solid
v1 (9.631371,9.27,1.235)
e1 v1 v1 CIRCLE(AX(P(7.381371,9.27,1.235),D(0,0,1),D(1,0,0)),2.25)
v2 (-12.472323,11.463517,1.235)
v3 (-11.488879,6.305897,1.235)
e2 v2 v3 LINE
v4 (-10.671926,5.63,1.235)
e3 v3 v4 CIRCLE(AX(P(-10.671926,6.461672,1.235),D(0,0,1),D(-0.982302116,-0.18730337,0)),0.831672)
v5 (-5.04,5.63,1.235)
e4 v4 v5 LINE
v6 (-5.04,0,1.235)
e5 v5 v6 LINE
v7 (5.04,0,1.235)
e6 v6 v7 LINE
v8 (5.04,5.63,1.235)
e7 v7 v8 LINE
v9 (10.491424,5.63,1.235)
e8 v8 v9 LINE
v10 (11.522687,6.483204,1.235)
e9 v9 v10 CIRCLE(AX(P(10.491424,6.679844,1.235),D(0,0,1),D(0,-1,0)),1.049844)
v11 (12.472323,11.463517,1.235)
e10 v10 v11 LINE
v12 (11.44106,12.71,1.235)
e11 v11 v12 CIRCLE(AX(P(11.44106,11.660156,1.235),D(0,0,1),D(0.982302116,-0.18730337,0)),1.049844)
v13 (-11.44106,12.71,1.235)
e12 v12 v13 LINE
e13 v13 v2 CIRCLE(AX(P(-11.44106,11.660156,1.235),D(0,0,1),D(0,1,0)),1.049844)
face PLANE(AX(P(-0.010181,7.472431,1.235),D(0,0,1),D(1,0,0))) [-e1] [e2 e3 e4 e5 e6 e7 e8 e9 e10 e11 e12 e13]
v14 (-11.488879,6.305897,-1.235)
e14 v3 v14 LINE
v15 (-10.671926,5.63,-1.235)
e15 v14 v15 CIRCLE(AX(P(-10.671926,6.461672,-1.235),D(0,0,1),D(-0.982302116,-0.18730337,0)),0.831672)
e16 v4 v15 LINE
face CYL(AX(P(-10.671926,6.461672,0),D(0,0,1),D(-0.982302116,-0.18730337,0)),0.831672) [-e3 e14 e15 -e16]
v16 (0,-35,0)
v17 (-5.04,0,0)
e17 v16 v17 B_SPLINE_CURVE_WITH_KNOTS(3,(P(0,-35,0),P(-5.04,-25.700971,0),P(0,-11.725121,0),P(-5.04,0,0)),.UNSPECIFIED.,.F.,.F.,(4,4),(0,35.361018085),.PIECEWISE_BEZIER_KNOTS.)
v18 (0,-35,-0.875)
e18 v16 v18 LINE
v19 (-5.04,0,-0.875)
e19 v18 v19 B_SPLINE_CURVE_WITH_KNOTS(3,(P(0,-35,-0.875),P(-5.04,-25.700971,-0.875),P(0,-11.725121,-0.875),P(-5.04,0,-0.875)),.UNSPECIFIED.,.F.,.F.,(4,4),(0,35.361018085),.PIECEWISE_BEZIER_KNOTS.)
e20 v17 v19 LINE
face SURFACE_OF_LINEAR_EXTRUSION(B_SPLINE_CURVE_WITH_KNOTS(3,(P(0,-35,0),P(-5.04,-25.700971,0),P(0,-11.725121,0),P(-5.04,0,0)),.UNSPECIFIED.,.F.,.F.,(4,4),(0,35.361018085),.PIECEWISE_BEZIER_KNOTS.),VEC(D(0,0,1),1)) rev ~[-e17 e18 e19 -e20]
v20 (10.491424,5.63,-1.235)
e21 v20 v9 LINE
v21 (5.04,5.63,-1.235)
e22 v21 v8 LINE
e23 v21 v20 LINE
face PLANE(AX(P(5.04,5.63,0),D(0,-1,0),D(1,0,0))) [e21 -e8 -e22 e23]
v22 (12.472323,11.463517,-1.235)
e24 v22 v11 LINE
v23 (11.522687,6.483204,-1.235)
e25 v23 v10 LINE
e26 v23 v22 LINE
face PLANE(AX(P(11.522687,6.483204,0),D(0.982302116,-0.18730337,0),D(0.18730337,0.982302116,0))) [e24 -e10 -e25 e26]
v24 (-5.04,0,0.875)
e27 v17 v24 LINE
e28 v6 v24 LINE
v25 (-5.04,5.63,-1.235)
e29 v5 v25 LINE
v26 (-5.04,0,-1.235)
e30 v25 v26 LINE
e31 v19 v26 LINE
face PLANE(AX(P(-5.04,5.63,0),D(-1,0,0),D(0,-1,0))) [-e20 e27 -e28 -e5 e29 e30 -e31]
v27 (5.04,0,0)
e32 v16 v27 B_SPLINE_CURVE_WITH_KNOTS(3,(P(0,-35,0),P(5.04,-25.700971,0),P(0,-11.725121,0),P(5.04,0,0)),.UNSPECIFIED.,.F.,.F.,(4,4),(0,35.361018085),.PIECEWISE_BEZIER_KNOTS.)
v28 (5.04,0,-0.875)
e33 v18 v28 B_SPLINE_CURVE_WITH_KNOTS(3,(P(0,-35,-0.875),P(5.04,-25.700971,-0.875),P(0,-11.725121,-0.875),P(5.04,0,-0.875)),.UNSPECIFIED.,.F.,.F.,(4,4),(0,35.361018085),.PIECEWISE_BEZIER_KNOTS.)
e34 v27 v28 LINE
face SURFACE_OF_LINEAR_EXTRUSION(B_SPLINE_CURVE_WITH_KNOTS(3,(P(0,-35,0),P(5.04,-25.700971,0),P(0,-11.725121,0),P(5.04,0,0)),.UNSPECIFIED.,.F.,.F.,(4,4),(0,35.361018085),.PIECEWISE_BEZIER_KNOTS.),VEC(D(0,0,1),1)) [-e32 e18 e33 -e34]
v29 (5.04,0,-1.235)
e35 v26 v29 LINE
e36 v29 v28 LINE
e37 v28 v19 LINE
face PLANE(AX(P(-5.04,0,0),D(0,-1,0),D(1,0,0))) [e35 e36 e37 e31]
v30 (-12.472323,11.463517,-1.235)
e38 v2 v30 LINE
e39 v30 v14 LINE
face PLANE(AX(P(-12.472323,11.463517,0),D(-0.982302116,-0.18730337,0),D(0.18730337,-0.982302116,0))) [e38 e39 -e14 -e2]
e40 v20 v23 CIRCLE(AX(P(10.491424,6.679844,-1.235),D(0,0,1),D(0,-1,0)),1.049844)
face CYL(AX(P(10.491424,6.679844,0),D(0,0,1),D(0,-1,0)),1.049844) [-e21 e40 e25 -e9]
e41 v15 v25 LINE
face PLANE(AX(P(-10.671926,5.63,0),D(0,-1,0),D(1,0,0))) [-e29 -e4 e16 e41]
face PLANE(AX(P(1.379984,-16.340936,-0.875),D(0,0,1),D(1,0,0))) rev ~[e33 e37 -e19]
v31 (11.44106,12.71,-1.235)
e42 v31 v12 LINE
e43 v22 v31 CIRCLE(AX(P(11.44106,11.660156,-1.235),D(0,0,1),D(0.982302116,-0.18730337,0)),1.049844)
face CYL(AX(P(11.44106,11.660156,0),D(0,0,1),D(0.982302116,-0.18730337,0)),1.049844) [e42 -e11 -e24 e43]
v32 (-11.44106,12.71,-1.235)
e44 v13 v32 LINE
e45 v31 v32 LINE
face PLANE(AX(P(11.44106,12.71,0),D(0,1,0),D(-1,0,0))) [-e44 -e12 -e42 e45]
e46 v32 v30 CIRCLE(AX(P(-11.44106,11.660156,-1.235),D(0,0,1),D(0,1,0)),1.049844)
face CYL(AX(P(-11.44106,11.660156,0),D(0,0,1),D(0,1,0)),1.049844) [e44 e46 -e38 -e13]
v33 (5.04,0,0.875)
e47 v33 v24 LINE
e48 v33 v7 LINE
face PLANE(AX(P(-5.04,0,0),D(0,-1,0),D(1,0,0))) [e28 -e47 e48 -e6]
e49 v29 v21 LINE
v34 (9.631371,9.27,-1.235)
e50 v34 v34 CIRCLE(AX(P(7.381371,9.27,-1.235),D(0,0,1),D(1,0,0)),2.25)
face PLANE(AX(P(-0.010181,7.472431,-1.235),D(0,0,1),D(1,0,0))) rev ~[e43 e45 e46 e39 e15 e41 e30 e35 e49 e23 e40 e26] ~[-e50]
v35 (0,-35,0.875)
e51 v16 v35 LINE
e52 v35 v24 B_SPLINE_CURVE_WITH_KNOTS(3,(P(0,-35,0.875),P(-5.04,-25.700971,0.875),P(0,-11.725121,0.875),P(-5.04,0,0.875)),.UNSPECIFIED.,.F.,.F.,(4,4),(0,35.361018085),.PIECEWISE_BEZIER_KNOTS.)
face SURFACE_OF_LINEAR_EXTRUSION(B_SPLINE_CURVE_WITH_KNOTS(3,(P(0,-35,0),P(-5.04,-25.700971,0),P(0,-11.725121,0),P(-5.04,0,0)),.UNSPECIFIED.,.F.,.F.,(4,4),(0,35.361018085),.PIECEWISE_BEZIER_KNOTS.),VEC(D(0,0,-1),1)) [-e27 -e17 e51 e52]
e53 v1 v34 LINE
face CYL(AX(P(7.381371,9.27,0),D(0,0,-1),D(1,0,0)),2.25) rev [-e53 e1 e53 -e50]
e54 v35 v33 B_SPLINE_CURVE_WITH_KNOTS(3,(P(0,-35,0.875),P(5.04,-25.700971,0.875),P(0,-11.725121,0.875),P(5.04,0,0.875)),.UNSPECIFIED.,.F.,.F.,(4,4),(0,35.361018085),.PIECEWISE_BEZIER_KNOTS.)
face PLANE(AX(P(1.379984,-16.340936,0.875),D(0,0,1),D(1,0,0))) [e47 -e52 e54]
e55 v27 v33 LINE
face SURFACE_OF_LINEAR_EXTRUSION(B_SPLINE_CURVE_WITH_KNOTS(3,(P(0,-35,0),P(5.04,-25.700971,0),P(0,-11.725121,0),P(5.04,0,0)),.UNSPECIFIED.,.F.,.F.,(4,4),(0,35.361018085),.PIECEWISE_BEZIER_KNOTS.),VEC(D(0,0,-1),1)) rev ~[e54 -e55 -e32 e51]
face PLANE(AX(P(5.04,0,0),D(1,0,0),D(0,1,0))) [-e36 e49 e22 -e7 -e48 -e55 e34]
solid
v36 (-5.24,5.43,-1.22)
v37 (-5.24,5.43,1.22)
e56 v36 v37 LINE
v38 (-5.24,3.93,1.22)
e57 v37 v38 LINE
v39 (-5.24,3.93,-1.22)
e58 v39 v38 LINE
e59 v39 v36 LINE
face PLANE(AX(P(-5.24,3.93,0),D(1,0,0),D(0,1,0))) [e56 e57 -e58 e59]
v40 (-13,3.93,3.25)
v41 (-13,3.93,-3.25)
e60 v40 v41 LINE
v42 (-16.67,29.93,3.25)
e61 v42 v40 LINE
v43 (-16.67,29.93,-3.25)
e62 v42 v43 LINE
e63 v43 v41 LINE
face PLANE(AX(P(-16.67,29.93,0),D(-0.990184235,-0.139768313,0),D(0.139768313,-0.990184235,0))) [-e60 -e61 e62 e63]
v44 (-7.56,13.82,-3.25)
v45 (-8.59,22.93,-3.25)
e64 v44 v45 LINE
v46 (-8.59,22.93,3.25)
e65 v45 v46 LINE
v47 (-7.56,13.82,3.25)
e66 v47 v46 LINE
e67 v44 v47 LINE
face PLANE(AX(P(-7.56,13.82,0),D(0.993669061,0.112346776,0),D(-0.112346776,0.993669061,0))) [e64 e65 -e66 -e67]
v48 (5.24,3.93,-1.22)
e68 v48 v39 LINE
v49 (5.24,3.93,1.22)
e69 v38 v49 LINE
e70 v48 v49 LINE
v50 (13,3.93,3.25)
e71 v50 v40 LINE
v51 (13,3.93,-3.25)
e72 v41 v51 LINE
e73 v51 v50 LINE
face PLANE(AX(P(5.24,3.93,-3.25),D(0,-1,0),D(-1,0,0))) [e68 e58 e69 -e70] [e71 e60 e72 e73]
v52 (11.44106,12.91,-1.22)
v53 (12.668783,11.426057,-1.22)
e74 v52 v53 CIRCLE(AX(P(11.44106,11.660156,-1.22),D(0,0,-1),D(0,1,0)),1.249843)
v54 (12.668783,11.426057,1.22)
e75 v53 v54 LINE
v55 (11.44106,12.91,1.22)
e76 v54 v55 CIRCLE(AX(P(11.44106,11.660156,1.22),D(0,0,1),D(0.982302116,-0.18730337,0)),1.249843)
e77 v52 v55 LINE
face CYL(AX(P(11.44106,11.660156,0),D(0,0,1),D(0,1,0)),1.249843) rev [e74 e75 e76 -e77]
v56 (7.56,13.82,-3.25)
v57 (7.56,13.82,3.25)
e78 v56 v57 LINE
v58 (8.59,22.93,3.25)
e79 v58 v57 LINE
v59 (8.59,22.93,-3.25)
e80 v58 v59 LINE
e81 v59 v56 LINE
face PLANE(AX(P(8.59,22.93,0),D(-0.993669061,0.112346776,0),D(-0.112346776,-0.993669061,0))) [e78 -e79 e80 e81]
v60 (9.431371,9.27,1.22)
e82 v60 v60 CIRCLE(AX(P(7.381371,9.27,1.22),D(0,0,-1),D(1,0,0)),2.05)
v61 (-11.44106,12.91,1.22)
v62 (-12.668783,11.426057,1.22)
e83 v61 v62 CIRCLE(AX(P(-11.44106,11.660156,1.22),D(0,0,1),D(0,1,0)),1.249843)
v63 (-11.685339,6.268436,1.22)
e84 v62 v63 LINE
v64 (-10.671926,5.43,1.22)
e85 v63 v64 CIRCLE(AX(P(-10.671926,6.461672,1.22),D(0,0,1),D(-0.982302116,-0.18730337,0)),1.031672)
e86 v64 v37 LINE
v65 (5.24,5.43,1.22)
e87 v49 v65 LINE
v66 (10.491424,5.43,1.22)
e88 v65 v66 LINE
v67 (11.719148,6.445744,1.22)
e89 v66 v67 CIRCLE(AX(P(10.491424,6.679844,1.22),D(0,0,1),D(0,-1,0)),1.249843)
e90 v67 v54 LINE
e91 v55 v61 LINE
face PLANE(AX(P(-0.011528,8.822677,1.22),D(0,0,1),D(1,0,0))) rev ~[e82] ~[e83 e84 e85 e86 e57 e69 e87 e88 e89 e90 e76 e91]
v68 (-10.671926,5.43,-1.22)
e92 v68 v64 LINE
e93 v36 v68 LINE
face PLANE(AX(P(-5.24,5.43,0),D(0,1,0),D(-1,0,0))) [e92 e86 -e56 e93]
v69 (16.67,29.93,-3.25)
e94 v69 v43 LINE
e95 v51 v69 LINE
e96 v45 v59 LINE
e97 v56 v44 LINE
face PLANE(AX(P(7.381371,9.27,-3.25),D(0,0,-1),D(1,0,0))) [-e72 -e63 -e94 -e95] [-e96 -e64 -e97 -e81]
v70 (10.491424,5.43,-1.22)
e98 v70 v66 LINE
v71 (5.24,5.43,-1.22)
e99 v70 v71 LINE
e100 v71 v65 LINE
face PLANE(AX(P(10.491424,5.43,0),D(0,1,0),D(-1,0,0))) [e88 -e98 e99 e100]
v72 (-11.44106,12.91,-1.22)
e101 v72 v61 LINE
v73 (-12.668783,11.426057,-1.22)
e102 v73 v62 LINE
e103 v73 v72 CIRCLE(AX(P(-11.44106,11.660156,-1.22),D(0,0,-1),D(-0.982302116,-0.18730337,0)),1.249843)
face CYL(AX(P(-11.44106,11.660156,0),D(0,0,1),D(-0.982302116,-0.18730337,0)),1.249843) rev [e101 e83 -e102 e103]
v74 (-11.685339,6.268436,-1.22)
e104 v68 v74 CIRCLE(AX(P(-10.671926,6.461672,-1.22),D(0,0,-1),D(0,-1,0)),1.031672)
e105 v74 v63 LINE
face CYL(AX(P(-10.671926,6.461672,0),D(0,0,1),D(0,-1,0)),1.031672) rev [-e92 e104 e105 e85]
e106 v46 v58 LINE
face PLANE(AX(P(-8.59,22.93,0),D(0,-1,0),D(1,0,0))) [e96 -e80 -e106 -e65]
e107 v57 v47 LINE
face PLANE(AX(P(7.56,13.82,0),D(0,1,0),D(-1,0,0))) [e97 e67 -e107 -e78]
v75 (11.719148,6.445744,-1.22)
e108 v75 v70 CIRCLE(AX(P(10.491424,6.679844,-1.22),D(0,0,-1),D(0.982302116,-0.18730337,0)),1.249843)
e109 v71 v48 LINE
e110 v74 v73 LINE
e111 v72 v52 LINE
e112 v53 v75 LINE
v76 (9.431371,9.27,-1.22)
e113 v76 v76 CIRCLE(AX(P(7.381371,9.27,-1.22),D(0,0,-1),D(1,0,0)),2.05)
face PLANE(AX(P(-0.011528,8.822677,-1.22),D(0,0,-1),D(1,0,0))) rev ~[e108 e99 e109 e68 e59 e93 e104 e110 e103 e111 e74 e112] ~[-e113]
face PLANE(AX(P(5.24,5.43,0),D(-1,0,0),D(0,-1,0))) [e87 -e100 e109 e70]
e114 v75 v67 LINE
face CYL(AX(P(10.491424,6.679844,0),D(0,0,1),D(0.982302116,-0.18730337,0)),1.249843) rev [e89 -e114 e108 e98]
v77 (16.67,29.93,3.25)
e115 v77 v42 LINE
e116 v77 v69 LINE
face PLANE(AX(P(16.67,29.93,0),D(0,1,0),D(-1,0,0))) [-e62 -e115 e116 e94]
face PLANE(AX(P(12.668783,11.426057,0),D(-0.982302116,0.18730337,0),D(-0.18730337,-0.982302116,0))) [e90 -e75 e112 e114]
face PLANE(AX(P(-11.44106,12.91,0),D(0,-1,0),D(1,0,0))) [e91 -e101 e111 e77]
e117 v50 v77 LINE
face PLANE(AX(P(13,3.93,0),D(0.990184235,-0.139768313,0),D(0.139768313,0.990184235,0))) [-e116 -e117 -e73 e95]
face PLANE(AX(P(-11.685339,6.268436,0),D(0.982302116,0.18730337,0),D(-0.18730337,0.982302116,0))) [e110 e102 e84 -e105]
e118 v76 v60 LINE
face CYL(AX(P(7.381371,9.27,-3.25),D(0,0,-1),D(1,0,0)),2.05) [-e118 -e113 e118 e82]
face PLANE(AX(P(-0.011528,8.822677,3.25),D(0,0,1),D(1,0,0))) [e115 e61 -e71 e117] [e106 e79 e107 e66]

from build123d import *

# Parameters (mm, degrees)
F0_R      = 2.25
F1_DEPTH  = 1.235
F2_DEPTH  = 0.875
F5_DEPTH  = 3.25
F7_DEPTH  = 2.03
F8_R      = 2.0499999718
F9_DEPTH  = 2.03
F10_DEPTH = 4.5


with BuildPart() as f1:
    # F0 (on Top) → F1 (new body, symmetric)
    with BuildSketch(Plane.XY):
        with BuildLine():
            Line((-5.04, 0), (0, 0))
            Line((0, 0), (5.04, 0))
            Line((5.04, 0), (5.04, 5.63))
            Line((5.04, 5.63), (10.4914237453, 5.63))
            ThreePointArc((10.4914237453, 5.63), (11.1606512853, 5.8709517365), (11.5226872593, 6.4832042932))
            Line((11.5226872593, 6.4832042932), (12.4723232041, 11.4635172481))
            ThreePointArc((12.4723232041, 11.4635172481), (12.2499514761, 12.3293840175), (11.4410596901, 12.71))
            Line((11.4410596901, 12.71), (0, 12.71))
            Line((0, 12.71), (-11.4410596901, 12.71))
            ThreePointArc((-11.4410596901, 12.71), (-12.2499514761, 12.3293840175), (-12.4723232041, 11.4635172481))
            Line((-12.4723232041, 11.4635172481), (-11.4888786252, 6.3058967898))
            ThreePointArc((-11.4888786252, 6.3058967898), (-11.2020786705, 5.8208786753), (-10.6719257522, 5.63))
            Line((-10.6719257522, 5.63), (-5.04, 5.63))
            Line((-5.04, 5.63), (-5.04, 0))
        make_face()
        with Locations((7.3813709514, 9.27)):
            Circle(F0_R, mode=Mode.SUBTRACT)
    extrude(amount=F1_DEPTH, both=True)

    # F0 (on Top) → F2 (join, symmetric)
    with BuildSketch(Plane.XY):
        with BuildLine():
            Line((5.04, 0), (0, 0))
            Line((0, 0), (0, -35))
            add(Edge.make_bspline(
                [(0, -35), (5.04, -25.7009714842), (0, -11.7251211777), (5.04, 0)],
                knots=[0, 0, 0, 0, 35.3610180849, 35.3610180849, 35.3610180849, 35.3610180849], degree=3))
        make_face()
        with BuildLine():
            Line((0, -35), (0, 0))
            Line((0, 0), (-5.04, 0))
            add(Edge.make_bspline(
                [(0, -35), (-5.04, -25.7009714842), (0, -11.7251211777), (-5.04, 0)],
                knots=[0, 0, 0, 0, 35.3610180849, 35.3610180849, 35.3610180849, 35.3610180849], degree=3))
        make_face()
    extrude(amount=F2_DEPTH, both=True)


with BuildPart() as f5:
    # F4 (on Top) → F5 (new body, symmetric)
    with BuildSketch(Plane.XY):
        with BuildLine():
            Line((-13, 3.9300001469), (-5.2399998531, 3.9300001469))
            Line((-5.2399998531, 3.9300001469), (-5.2399998531, 5.4300001469))
            Line((-5.2399998531, 5.4300001469), (-10.6719257522, 5.4300001469))
            ThreePointArc((-10.6719257522, 5.4300001469), (-11.3295694887, 5.666781198), (-11.6853389041, 6.2684361434))
            Line((-11.6853389041, 6.2684361434), (-12.668783483, 11.4260566017))
            ThreePointArc((-12.668783483, 11.4260566017), (-12.4040489534, 12.4568748357), (-11.4410596901, 12.9099998531))
            Line((-11.4410596901, 12.9099998531), (11.4410596901, 12.9099998531))
            ThreePointArc((11.4410596901, 12.9099998531), (12.4040489534, 12.4568748357), (12.668783483, 11.4260566017))
            Line((12.668783483, 11.4260566017), (11.7191475382, 6.4457436467))
            ThreePointArc((11.7191475382, 6.4457436467), (11.2881421035, 5.7168542592), (10.4914237453, 5.4300001469))
            Line((10.4914237453, 5.4300001469), (5.2399998531, 5.4300001469))
            Line((5.2399998531, 5.4300001469), (5.2399998531, 3.9300001469))
            Line((5.2399998531, 3.9300001469), (13, 3.9300001469))
            Line((13, 3.9300001469), (16.67, 29.9300001469))
            Line((16.67, 29.9300001469), (0, 29.9300001469))
            Line((0, 29.9300001469), (-16.67, 29.9300001469))
            Line((-16.67, 29.9300001469), (-13, 3.9300001469))
        make_face()
        Polygon((7.56, 13.8200001469), (0, 13.8200001469), (-7.56, 13.8200001469), (-8.59, 22.9300001469), (0, 22.9300001469), (8.59, 22.9300001469), align=None, mode=Mode.SUBTRACT)
    extrude(amount=F5_DEPTH, both=True)

    # F6 (on face) → F7 (join)
    with BuildSketch(Plane.XY.offset(3.25)):
        with BuildLine():
            Line((11.4410596901, 12.9099998531), (-11.4410596901, 12.9099998531))
            ThreePointArc((-11.4410596901, 12.9099998531), (-12.4040489534, 12.4568748357), (-12.668783483, 11.4260566017))
            Line((-12.668783483, 11.4260566017), (-11.6853389041, 6.2684361434))
            ThreePointArc((-11.6853389041, 6.2684361434), (-11.3295694887, 5.666781198), (-10.6719257522, 5.4300001469))
            Line((-10.6719257522, 5.4300001469), (-5.2399998531, 5.4300001469))
            Line((-5.2399998531, 5.4300001469), (-5.2399998531, 3.9300001469))
            Line((-5.2399998531, 3.9300001469), (5.2399998531, 3.9300001469))
            Line((5.2399998531, 3.9300001469), (5.2399998531, 5.4300001469))
            Line((5.2399998531, 5.4300001469), (10.4914237453, 5.4300001469))
            ThreePointArc((10.4914237453, 5.4300001469), (11.2881421035, 5.7168542592), (11.7191475382, 6.4457436467))
            Line((11.7191475382, 6.4457436467), (12.668783483, 11.4260566017))
            ThreePointArc((12.668783483, 11.4260566017), (12.4040489534, 12.4568748357), (11.4410596901, 12.9099998531))
        make_face()
    extrude(amount=-F7_DEPTH)

    # F8 (on face) → F9 (join)
    with BuildSketch(Plane(origin=(0, 0, -3.25), x_dir=(1, 0, 0), z_dir=(0, 0, -1))):
        with BuildLine():
            ThreePointArc((-12.668783483, -11.4260566017), (-12.4040489534, -12.4568748357), (-11.4410596901, -12.9099998531))
            Line((-11.4410596901, -12.9099998531), (11.4410596901, -12.9099998531))
            ThreePointArc((11.4410596901, -12.9099998531), (12.4040489534, -12.4568748357), (12.668783483, -11.4260566017))
            Line((12.668783483, -11.4260566017), (11.7191475382, -6.4457436467))
            ThreePointArc((11.7191475382, -6.4457436467), (11.2881421035, -5.7168542592), (10.4914237453, -5.4300001469))
            Line((10.4914237453, -5.4300001469), (5.2399998531, -5.4300001469))
            Line((5.2399998531, -5.4300001469), (5.2399998531, -3.9300001469))
            Line((5.2399998531, -3.9300001469), (-5.2399998531, -3.9300001469))
            Line((-5.2399998531, -3.9300001469), (-5.2399998531, -5.4300001469))
            Line((-5.2399998531, -5.4300001469), (-10.6719257522, -5.4300001469))
            ThreePointArc((-10.6719257522, -5.4300001469), (-11.3295694887, -5.666781198), (-11.6853389041, -6.2684361434))
            Line((-11.6853389041, -6.2684361434), (-12.668783483, -11.4260566017))
        make_face()
        with Locations((7.3813709514, -9.27)):
            Circle(F8_R, mode=Mode.SUBTRACT)
    extrude(amount=-F9_DEPTH)

    # F8 (on face) → F10 (join)
    with BuildSketch(Plane(origin=(0, 0, -3.25), x_dir=(1, 0, 0), z_dir=(0, 0, -1))):
        with Locations((7.3813709514, -9.27)):
            Circle(F8_R)
    extrude(amount=-F10_DEPTH)


solid = Compound([f1.part, f5.part])
